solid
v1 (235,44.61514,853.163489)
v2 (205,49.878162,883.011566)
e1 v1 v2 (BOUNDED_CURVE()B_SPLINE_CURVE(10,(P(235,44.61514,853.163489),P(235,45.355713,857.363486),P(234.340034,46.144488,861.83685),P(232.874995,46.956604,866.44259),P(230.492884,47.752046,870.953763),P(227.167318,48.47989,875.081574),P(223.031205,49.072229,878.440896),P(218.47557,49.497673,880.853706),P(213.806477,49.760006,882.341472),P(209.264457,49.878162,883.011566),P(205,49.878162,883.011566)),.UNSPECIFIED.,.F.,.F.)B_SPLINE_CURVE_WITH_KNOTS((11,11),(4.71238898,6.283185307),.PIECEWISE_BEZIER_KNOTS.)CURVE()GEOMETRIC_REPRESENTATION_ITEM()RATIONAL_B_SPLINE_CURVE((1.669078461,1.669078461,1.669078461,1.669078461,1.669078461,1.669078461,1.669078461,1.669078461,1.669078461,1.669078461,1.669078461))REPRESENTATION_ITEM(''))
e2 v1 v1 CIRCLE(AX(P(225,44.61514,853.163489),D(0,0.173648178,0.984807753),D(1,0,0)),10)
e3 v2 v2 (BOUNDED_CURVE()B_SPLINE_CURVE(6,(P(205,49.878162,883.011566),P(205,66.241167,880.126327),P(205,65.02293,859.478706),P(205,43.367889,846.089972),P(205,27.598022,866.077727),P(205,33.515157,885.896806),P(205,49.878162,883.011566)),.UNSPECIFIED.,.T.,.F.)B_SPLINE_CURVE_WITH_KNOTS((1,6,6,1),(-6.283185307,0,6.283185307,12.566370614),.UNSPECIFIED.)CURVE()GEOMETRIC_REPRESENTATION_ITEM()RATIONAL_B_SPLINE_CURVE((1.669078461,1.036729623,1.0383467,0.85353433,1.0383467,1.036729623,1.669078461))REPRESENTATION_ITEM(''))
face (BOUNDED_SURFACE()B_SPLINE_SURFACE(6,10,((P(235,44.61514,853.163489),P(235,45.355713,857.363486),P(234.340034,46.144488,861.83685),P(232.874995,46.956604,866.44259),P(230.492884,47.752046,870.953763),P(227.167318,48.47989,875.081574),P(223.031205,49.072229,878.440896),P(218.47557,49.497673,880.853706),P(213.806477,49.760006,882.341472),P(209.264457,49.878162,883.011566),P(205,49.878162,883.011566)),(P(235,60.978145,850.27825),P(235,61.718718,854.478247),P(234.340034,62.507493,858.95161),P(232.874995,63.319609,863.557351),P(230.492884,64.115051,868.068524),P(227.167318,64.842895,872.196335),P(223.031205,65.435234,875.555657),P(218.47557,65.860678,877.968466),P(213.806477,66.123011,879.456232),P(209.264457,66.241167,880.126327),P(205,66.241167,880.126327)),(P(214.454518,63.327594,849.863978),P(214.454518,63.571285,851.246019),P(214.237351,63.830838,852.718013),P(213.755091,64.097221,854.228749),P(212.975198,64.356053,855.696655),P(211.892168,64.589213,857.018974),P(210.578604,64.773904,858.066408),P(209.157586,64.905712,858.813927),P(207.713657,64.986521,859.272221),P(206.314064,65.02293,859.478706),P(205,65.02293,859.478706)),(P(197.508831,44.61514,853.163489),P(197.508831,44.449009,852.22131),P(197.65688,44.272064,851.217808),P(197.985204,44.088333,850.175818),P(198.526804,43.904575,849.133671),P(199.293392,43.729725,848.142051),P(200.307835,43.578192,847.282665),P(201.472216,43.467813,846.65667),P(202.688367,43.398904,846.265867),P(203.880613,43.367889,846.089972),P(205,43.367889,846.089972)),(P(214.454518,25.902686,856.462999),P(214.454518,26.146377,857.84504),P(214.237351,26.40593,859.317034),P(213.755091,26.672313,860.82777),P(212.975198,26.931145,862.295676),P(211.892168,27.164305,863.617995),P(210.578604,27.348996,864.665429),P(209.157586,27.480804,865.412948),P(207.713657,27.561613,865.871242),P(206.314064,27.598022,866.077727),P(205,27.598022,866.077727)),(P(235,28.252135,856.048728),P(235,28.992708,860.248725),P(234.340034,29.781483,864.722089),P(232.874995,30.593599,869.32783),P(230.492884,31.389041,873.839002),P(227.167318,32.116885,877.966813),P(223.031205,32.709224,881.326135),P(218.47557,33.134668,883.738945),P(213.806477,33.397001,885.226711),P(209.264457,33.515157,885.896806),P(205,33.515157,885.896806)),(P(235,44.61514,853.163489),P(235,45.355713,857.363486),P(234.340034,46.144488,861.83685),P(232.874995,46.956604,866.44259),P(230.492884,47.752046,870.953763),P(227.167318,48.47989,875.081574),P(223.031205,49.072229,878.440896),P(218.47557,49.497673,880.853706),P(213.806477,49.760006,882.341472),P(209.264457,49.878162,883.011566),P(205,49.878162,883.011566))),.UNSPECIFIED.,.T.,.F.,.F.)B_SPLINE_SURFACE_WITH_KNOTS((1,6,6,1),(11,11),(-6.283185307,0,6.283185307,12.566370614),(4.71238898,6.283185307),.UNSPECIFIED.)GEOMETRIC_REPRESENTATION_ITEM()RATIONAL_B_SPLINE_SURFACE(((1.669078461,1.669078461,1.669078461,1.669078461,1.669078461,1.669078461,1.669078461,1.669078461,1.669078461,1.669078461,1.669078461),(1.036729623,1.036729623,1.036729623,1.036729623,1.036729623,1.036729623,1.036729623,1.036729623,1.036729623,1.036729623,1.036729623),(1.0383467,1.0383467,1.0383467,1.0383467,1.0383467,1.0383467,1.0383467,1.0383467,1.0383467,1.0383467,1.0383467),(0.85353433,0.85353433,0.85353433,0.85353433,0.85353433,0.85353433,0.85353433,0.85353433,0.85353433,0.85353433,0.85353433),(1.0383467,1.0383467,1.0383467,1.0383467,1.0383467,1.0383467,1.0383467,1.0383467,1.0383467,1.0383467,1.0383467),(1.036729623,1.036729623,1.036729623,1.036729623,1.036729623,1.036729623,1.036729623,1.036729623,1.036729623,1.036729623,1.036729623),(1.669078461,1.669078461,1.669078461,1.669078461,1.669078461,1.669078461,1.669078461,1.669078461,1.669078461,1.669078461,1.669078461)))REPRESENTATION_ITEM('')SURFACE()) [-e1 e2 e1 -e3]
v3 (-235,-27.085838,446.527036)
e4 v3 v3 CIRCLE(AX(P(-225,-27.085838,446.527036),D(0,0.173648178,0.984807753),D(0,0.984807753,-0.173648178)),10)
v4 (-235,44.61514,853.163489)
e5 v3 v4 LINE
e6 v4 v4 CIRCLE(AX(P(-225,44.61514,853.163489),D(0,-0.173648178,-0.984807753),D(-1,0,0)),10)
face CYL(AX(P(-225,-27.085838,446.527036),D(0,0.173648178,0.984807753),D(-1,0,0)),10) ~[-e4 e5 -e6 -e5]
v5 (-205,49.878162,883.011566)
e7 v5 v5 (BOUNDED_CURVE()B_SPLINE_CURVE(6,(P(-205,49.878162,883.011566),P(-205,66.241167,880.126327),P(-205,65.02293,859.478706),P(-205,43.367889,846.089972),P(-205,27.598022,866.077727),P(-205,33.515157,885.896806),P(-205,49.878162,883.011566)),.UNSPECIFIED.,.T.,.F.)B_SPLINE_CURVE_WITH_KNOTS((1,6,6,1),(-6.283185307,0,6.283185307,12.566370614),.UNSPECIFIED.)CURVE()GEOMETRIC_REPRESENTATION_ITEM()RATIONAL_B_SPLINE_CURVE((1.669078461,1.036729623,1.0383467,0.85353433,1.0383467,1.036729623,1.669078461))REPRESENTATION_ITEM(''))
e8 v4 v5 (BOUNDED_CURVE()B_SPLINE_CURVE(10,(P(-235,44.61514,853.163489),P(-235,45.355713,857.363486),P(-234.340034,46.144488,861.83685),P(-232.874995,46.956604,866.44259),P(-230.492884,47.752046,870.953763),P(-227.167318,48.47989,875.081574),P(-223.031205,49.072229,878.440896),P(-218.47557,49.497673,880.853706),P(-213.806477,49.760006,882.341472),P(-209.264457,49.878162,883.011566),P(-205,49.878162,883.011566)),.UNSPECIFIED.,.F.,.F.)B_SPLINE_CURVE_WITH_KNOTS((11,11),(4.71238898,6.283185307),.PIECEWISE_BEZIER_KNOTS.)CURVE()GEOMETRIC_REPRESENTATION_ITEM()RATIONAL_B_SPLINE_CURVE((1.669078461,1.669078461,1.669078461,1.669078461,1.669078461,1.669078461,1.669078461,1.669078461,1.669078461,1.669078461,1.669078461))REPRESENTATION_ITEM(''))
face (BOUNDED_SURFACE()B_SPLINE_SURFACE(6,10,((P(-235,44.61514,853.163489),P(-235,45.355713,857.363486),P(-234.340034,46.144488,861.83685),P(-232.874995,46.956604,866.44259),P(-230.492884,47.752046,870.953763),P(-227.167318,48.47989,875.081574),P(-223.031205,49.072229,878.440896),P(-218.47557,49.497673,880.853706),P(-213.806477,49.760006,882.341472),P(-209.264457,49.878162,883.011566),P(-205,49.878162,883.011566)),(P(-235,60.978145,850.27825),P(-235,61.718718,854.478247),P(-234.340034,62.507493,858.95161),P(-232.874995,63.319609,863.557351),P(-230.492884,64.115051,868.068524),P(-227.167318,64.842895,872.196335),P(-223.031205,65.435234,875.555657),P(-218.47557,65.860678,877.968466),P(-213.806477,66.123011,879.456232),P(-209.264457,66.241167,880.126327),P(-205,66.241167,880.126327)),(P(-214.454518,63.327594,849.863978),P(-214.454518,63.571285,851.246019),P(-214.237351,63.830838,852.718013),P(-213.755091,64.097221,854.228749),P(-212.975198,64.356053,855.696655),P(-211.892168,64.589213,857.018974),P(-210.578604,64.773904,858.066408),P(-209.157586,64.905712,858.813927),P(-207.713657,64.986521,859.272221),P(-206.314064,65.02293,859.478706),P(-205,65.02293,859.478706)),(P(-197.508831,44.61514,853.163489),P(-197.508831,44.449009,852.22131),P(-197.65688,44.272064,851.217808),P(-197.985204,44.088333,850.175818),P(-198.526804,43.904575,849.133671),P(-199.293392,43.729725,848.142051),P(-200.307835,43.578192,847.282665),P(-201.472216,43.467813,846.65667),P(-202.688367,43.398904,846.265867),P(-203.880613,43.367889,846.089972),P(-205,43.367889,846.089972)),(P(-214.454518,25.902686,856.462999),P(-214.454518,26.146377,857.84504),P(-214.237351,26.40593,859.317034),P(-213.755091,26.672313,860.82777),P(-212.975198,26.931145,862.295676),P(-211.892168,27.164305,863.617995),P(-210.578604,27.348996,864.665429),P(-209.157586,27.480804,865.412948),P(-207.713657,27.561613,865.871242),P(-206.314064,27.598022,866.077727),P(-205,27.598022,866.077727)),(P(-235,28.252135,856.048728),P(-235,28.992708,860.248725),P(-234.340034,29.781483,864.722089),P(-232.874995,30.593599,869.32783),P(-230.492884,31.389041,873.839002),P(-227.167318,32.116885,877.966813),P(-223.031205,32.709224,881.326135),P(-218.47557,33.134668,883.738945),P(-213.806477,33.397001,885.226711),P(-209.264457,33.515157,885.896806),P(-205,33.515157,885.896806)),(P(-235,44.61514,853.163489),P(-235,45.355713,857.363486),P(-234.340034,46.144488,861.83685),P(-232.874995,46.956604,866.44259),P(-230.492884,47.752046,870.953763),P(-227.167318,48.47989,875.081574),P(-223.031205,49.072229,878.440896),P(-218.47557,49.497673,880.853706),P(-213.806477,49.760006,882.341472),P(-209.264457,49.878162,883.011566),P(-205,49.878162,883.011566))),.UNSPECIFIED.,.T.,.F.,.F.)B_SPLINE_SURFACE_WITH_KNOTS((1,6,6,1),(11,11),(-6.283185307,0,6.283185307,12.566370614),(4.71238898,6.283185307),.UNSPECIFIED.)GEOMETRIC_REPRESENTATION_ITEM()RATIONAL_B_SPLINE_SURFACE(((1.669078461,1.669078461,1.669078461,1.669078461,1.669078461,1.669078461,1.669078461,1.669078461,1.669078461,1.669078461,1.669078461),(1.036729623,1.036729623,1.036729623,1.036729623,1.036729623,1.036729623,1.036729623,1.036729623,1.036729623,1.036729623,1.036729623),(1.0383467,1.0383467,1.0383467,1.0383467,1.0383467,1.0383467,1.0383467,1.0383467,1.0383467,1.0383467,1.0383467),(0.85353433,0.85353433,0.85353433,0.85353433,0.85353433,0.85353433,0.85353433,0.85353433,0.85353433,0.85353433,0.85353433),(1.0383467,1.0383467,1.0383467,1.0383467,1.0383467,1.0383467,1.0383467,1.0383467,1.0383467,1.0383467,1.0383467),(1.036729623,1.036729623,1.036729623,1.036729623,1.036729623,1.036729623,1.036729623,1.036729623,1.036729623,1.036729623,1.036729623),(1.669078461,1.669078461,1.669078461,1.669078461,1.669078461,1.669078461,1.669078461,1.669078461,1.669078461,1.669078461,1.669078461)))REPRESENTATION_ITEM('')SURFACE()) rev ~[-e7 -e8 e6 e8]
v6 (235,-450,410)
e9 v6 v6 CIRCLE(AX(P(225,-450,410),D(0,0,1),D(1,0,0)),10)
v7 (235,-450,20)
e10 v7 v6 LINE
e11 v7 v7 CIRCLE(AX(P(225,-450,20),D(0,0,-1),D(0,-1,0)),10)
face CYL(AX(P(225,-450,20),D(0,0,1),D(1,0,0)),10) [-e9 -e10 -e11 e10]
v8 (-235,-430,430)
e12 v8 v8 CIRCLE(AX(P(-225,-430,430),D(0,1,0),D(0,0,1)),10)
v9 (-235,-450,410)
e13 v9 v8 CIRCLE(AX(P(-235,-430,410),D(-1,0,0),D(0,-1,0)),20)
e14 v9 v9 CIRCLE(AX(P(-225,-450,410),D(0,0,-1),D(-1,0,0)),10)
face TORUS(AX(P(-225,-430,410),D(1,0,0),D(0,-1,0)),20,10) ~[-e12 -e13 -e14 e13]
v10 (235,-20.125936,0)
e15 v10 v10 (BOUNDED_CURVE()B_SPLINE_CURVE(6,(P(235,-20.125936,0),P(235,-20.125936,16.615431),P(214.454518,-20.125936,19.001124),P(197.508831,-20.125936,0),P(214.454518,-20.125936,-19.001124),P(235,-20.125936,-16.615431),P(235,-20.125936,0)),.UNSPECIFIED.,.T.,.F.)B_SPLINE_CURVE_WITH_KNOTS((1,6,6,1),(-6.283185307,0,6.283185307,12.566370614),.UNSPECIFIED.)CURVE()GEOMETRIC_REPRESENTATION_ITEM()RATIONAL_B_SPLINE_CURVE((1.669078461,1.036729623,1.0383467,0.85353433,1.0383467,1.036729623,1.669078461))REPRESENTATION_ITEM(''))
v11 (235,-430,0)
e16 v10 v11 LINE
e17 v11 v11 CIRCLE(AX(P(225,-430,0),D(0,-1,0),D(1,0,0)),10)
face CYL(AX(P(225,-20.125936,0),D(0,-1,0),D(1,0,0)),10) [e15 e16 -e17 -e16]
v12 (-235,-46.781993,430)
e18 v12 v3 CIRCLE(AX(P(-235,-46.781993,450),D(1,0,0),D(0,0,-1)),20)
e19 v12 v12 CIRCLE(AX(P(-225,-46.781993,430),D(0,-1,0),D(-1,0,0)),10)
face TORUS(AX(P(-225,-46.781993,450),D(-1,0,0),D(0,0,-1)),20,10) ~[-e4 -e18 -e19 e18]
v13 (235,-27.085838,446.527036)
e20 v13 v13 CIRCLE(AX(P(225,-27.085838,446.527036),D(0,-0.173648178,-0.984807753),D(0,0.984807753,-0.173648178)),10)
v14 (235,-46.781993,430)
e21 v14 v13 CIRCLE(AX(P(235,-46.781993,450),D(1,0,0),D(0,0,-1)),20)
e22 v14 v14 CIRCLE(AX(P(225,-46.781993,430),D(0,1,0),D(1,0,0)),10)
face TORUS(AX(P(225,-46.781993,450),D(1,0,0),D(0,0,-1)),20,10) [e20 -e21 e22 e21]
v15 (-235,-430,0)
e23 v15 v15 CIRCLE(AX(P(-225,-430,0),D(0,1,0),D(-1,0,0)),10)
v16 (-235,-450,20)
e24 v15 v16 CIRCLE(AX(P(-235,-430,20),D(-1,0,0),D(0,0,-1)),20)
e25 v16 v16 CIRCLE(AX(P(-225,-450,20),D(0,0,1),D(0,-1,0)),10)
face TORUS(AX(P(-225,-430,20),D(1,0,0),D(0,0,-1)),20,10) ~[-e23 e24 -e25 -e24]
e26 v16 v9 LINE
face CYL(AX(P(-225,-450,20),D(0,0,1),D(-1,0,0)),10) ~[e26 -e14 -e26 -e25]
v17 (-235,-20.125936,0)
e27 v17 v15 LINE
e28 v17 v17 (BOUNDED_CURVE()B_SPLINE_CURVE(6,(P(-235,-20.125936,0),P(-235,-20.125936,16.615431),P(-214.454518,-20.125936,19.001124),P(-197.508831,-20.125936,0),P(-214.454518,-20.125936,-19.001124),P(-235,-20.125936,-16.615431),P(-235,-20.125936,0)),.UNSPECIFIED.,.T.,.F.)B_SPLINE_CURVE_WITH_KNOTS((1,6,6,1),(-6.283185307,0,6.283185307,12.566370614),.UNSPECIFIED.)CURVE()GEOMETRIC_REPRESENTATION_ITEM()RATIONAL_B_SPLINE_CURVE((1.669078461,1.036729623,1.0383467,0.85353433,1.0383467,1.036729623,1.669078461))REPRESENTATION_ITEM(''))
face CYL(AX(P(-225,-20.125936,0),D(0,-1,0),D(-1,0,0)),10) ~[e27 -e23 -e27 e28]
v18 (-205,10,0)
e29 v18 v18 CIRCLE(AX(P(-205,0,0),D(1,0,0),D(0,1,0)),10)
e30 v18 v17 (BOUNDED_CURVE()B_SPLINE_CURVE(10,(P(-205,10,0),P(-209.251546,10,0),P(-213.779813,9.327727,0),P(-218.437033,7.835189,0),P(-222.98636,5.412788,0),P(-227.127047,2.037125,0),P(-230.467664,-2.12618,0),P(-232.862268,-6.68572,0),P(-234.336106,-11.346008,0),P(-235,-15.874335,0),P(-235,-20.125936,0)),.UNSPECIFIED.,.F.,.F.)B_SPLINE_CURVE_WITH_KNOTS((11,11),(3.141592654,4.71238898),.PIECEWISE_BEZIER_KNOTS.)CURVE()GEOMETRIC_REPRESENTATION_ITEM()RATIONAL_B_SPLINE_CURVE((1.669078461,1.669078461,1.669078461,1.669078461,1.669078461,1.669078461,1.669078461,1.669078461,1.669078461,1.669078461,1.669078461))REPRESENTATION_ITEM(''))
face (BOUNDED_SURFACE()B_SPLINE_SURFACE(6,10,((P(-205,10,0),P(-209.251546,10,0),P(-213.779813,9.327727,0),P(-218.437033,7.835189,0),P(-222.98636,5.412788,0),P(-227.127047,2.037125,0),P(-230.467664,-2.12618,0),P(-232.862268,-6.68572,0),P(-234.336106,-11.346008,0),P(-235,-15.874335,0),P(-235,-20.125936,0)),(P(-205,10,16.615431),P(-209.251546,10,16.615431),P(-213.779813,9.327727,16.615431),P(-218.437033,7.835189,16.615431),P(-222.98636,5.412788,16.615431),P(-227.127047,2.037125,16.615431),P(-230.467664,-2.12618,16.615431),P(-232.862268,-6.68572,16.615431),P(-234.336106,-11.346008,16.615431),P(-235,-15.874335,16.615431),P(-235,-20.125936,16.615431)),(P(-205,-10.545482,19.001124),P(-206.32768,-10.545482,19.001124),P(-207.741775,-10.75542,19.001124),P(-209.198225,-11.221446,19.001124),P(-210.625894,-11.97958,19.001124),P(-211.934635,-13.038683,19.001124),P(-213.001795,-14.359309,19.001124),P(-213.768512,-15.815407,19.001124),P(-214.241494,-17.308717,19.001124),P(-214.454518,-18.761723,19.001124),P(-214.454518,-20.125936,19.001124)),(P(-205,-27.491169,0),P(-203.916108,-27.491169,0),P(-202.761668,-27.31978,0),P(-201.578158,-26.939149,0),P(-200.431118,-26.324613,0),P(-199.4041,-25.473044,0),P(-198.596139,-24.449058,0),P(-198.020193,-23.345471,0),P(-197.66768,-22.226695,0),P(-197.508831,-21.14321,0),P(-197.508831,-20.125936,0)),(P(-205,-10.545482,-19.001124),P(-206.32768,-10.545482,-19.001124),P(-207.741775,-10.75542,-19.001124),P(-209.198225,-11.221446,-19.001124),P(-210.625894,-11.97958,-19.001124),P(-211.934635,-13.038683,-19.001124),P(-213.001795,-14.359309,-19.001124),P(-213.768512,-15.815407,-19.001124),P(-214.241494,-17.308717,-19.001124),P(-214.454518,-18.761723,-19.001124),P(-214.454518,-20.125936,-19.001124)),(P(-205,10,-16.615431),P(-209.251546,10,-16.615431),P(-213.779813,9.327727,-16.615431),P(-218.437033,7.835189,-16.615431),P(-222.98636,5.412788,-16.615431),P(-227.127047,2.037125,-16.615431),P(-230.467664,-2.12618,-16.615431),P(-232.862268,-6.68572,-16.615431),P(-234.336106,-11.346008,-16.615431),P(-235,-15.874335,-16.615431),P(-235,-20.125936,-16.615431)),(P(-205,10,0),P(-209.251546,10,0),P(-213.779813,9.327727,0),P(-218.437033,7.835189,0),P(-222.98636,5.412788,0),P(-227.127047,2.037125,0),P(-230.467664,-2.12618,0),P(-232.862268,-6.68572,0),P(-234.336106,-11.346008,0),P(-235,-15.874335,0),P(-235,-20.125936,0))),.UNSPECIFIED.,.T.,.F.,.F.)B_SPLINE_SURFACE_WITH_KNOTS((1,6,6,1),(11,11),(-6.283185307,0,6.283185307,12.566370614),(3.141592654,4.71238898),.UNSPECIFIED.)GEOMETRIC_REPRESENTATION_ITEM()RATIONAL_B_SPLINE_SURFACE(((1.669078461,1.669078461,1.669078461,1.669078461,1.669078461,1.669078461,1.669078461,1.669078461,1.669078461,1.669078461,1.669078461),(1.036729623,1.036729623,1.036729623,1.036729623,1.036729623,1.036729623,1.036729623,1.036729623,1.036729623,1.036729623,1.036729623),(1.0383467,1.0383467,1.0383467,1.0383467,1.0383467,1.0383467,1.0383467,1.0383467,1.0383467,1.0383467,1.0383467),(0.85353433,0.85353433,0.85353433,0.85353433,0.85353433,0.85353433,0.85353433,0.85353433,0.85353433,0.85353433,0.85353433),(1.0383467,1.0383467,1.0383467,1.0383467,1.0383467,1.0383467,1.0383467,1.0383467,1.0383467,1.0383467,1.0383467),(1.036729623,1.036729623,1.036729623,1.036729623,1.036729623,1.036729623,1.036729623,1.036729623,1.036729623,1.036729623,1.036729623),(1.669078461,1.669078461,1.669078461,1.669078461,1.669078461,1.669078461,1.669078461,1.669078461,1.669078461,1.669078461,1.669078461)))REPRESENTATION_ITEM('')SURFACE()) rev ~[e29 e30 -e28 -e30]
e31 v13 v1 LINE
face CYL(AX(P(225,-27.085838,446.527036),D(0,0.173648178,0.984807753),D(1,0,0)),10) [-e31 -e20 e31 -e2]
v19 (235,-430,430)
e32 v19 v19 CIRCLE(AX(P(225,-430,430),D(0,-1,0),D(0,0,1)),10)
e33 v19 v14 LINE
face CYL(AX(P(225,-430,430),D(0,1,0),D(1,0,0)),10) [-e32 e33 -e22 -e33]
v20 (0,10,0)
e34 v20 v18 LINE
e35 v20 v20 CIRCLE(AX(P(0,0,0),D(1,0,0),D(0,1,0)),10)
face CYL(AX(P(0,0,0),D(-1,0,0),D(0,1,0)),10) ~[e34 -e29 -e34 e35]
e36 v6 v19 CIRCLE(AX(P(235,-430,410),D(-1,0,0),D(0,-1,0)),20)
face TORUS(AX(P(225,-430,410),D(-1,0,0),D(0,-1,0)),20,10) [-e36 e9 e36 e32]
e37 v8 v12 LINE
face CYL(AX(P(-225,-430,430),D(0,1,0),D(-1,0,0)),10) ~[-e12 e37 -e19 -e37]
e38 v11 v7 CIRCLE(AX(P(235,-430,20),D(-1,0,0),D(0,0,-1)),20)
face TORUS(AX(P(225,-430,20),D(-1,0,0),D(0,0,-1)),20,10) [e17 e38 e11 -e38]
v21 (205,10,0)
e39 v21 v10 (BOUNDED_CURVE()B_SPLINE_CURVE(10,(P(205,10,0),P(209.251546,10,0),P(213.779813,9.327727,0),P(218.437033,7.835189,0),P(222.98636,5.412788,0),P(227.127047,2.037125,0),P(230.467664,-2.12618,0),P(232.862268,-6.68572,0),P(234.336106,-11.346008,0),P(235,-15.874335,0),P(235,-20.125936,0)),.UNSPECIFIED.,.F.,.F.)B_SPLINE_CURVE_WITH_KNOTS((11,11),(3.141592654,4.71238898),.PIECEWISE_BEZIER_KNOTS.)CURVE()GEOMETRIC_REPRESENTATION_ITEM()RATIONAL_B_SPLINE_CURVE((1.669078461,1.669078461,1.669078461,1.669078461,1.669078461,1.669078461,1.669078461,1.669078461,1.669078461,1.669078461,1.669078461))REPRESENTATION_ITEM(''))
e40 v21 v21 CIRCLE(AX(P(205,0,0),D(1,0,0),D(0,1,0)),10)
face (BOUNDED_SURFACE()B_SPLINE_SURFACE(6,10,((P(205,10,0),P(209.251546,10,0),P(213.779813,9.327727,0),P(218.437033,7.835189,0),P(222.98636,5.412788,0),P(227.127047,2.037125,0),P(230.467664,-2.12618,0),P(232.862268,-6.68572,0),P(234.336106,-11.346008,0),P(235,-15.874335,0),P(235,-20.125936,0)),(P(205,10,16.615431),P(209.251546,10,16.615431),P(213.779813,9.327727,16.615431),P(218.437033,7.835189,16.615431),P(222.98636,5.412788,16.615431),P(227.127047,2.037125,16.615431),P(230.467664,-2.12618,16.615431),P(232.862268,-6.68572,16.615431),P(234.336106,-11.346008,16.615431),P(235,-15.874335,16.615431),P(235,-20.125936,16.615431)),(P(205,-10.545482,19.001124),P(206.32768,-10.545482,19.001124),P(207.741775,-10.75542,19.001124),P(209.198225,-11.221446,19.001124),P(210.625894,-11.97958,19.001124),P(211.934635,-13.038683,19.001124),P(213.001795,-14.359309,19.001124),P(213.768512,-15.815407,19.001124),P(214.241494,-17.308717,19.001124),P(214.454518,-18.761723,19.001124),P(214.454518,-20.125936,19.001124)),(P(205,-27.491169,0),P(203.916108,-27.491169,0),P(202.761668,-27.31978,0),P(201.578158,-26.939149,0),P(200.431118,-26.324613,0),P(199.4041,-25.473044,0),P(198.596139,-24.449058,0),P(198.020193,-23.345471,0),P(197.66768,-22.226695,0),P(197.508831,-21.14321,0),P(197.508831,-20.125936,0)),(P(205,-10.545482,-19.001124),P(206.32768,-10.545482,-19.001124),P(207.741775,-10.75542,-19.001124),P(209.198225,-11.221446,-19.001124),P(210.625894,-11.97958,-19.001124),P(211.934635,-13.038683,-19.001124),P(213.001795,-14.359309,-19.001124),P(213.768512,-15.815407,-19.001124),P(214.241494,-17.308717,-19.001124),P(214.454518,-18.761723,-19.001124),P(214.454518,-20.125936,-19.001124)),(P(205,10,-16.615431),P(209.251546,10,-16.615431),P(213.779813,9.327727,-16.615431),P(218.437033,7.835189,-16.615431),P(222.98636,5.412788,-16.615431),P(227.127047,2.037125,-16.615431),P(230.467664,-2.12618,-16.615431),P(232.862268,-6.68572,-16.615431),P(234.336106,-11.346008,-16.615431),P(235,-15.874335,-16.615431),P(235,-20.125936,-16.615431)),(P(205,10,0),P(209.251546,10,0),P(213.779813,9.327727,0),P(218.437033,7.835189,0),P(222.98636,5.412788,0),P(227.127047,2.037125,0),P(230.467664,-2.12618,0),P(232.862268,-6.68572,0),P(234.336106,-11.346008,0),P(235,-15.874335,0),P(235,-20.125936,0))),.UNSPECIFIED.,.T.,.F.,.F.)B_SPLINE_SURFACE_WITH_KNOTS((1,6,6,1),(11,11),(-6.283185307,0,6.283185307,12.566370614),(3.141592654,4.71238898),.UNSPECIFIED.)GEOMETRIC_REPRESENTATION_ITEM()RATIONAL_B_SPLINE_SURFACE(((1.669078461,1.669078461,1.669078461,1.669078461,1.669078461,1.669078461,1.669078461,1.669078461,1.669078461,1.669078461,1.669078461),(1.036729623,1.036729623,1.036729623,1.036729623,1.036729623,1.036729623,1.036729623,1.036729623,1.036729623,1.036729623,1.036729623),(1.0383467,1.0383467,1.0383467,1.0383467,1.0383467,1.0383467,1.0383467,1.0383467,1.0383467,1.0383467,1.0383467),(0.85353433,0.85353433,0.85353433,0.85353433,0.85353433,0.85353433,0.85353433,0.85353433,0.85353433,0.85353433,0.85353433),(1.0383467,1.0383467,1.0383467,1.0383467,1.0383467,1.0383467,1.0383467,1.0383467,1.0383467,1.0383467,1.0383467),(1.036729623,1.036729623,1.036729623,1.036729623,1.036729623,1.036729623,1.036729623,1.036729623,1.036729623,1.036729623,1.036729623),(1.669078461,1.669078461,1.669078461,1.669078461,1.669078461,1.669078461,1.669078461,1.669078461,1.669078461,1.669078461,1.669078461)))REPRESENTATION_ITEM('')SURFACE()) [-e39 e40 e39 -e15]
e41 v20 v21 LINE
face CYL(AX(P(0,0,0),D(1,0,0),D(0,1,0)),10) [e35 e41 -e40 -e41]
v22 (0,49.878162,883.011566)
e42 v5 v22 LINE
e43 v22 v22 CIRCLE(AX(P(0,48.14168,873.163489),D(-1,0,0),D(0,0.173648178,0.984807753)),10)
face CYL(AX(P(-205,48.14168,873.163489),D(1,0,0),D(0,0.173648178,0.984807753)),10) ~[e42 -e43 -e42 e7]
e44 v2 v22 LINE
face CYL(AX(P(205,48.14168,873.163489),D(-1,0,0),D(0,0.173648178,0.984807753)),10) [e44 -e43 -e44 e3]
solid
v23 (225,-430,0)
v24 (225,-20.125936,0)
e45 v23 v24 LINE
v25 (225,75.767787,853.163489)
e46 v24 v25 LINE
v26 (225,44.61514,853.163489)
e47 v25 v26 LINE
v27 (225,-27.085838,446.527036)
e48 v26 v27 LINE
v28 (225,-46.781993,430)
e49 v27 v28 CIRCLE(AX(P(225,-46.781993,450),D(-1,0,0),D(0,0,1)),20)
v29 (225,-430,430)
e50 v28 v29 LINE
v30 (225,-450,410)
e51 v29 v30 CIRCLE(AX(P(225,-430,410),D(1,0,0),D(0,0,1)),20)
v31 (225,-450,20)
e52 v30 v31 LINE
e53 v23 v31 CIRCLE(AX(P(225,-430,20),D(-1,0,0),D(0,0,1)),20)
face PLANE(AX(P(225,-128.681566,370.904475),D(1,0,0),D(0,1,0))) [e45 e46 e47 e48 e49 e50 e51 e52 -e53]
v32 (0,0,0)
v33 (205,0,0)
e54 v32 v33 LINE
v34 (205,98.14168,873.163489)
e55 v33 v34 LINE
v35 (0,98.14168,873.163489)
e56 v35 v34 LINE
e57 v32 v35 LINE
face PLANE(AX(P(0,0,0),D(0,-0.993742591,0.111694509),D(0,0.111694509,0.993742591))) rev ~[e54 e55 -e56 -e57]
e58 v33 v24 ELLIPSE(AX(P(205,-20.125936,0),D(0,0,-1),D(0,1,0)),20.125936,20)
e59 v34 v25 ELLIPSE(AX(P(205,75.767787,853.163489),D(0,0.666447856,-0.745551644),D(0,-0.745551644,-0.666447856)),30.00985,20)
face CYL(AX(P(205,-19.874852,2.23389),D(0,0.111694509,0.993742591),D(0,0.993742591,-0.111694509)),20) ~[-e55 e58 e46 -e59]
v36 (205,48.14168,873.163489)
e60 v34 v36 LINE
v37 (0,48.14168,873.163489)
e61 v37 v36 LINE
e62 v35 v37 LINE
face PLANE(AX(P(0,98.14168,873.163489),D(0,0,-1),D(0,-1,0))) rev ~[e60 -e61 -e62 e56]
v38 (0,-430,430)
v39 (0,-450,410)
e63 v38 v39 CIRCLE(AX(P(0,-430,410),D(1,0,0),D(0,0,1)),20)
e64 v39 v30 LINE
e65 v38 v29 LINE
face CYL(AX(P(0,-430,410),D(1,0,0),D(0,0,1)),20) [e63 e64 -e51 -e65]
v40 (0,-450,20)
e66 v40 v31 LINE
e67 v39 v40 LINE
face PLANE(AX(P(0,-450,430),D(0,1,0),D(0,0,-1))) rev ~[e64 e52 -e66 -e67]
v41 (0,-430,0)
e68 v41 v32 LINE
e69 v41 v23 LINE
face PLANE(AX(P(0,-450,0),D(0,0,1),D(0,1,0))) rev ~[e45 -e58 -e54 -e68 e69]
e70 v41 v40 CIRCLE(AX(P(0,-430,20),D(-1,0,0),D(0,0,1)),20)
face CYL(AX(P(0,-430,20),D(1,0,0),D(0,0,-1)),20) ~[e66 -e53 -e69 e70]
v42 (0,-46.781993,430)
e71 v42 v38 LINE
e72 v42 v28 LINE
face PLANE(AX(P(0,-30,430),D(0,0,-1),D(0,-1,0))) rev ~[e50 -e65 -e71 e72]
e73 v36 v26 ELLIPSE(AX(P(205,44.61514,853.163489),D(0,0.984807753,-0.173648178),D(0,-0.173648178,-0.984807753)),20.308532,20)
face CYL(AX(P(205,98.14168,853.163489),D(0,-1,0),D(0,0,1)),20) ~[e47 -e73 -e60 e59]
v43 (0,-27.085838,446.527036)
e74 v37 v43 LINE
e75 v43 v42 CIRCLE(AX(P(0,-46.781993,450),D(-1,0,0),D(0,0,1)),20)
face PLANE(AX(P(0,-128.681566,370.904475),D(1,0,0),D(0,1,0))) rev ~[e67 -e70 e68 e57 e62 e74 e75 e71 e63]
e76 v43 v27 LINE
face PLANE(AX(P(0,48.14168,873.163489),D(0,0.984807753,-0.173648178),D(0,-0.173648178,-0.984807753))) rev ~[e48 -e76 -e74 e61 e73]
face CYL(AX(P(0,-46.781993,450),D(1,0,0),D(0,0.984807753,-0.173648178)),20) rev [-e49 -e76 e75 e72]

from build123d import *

# Parameters (mm, degrees)
F1_DEPTH = 225
F2_R     = 20
F6_R     = 10


with BuildPart() as f1:
    # F0 (on Right) → F1 (new body)
    with BuildSketch(Plane.YZ):
        Polygon((-450, 0), (0, 0), (98.1416799501, 873.1634888555), (48.1416799501, 873.1634888555), (-30, 430), (-450, 430), align=None)
    extrude(amount=F1_DEPTH)

    # F2
    f2_edges = [f1.edges().sort_by_distance(p)[0] for p in [
        (225, 73.14168, 873.163489),
        (225, 49.07084, 436.581744),
        (112.5, -30, 430),
        (112.5, -450, 430),
        (112.5, -450, 0),
    ]]
    fillet(f2_edges, radius=F2_R)


with BuildPart() as f7:
    # F7: sweep along a path in F5, F3, F4
    with BuildLine(Plane(origin=(0, 0, 0), x_dir=(1, 0, 0), z_dir=(0, 0, -1))) as f7_path:
        Line((0, 0), (205, 0))
        add(Plane(origin=(0, 0, 0), x_dir=(1, 0, 0), z_dir=(0, 0, -1)) * Edge.make_bspline(
            [(205, 0), (225, 0), (225, 20.1259362199)],
            knots=[3.1415926536, 3.1415926536, 3.1415926536, 4.7123889804, 4.7123889804, 4.7123889804], degree=2, weights=[1, 0.7071067812, 1]))
    with BuildLine(Plane.YZ.offset(225)) as f7_path_2:
        Line((-20.1259362199, 0), (-430, 0))
        ThreePointArc((-430, 0), (-444.1421356237, 5.8578643763), (-450, 20))
        Line((-450, 20), (-450, 410))
        ThreePointArc((-450, 410), (-444.1421356237, 424.1421356237), (-430, 430))
        Line((-430, 430), (-46.7819926235, 430))
        ThreePointArc((-46.7819926235, 430), (-33.9262404298, 434.6791111376), (-27.0858375633, 446.5270364467))
        Line((-27.0858375633, 446.5270364467), (44.6151403359, 853.1634888555))
    with BuildLine(Plane(origin=(0, -102.6297201268, 18.0963886809), x_dir=(1, 0, 0), z_dir=(0, -0.984807753, 0.1736481777))) as f7_path_3:
        add(Plane(origin=(0, -102.6297201268, 18.0963886809), x_dir=(1, 0, 0), z_dir=(0, -0.984807753, 0.1736481777)) * Edge.make_bspline(
            [(225, 847.9493562275), (225, 868.2578884652), (205, 868.2578884652)],
            knots=[4.7123889804, 4.7123889804, 4.7123889804, 6.2831853072, 6.2831853072, 6.2831853072], degree=2, weights=[1, 0.7071067812, 1]))
        Line((205, 868.2578884652), (0, 868.2578884652))
    # F6 (on Right) → F7 (sweep)
    with BuildSketch(Plane.YZ):
        Circle(F6_R)
    sweep(path=f7_path.line + f7_path_2.line + f7_path_3.line)

    # F8: F7 across face


with BuildPart() as f7_1:
    add(f7.part)
    add(f7.part.mirror(Plane(origin=(0, 0, 0), x_dir=(0, -1, 0), z_dir=(-1, 0, 0))))


solid = Compound([f1.part, f7_1.part])
